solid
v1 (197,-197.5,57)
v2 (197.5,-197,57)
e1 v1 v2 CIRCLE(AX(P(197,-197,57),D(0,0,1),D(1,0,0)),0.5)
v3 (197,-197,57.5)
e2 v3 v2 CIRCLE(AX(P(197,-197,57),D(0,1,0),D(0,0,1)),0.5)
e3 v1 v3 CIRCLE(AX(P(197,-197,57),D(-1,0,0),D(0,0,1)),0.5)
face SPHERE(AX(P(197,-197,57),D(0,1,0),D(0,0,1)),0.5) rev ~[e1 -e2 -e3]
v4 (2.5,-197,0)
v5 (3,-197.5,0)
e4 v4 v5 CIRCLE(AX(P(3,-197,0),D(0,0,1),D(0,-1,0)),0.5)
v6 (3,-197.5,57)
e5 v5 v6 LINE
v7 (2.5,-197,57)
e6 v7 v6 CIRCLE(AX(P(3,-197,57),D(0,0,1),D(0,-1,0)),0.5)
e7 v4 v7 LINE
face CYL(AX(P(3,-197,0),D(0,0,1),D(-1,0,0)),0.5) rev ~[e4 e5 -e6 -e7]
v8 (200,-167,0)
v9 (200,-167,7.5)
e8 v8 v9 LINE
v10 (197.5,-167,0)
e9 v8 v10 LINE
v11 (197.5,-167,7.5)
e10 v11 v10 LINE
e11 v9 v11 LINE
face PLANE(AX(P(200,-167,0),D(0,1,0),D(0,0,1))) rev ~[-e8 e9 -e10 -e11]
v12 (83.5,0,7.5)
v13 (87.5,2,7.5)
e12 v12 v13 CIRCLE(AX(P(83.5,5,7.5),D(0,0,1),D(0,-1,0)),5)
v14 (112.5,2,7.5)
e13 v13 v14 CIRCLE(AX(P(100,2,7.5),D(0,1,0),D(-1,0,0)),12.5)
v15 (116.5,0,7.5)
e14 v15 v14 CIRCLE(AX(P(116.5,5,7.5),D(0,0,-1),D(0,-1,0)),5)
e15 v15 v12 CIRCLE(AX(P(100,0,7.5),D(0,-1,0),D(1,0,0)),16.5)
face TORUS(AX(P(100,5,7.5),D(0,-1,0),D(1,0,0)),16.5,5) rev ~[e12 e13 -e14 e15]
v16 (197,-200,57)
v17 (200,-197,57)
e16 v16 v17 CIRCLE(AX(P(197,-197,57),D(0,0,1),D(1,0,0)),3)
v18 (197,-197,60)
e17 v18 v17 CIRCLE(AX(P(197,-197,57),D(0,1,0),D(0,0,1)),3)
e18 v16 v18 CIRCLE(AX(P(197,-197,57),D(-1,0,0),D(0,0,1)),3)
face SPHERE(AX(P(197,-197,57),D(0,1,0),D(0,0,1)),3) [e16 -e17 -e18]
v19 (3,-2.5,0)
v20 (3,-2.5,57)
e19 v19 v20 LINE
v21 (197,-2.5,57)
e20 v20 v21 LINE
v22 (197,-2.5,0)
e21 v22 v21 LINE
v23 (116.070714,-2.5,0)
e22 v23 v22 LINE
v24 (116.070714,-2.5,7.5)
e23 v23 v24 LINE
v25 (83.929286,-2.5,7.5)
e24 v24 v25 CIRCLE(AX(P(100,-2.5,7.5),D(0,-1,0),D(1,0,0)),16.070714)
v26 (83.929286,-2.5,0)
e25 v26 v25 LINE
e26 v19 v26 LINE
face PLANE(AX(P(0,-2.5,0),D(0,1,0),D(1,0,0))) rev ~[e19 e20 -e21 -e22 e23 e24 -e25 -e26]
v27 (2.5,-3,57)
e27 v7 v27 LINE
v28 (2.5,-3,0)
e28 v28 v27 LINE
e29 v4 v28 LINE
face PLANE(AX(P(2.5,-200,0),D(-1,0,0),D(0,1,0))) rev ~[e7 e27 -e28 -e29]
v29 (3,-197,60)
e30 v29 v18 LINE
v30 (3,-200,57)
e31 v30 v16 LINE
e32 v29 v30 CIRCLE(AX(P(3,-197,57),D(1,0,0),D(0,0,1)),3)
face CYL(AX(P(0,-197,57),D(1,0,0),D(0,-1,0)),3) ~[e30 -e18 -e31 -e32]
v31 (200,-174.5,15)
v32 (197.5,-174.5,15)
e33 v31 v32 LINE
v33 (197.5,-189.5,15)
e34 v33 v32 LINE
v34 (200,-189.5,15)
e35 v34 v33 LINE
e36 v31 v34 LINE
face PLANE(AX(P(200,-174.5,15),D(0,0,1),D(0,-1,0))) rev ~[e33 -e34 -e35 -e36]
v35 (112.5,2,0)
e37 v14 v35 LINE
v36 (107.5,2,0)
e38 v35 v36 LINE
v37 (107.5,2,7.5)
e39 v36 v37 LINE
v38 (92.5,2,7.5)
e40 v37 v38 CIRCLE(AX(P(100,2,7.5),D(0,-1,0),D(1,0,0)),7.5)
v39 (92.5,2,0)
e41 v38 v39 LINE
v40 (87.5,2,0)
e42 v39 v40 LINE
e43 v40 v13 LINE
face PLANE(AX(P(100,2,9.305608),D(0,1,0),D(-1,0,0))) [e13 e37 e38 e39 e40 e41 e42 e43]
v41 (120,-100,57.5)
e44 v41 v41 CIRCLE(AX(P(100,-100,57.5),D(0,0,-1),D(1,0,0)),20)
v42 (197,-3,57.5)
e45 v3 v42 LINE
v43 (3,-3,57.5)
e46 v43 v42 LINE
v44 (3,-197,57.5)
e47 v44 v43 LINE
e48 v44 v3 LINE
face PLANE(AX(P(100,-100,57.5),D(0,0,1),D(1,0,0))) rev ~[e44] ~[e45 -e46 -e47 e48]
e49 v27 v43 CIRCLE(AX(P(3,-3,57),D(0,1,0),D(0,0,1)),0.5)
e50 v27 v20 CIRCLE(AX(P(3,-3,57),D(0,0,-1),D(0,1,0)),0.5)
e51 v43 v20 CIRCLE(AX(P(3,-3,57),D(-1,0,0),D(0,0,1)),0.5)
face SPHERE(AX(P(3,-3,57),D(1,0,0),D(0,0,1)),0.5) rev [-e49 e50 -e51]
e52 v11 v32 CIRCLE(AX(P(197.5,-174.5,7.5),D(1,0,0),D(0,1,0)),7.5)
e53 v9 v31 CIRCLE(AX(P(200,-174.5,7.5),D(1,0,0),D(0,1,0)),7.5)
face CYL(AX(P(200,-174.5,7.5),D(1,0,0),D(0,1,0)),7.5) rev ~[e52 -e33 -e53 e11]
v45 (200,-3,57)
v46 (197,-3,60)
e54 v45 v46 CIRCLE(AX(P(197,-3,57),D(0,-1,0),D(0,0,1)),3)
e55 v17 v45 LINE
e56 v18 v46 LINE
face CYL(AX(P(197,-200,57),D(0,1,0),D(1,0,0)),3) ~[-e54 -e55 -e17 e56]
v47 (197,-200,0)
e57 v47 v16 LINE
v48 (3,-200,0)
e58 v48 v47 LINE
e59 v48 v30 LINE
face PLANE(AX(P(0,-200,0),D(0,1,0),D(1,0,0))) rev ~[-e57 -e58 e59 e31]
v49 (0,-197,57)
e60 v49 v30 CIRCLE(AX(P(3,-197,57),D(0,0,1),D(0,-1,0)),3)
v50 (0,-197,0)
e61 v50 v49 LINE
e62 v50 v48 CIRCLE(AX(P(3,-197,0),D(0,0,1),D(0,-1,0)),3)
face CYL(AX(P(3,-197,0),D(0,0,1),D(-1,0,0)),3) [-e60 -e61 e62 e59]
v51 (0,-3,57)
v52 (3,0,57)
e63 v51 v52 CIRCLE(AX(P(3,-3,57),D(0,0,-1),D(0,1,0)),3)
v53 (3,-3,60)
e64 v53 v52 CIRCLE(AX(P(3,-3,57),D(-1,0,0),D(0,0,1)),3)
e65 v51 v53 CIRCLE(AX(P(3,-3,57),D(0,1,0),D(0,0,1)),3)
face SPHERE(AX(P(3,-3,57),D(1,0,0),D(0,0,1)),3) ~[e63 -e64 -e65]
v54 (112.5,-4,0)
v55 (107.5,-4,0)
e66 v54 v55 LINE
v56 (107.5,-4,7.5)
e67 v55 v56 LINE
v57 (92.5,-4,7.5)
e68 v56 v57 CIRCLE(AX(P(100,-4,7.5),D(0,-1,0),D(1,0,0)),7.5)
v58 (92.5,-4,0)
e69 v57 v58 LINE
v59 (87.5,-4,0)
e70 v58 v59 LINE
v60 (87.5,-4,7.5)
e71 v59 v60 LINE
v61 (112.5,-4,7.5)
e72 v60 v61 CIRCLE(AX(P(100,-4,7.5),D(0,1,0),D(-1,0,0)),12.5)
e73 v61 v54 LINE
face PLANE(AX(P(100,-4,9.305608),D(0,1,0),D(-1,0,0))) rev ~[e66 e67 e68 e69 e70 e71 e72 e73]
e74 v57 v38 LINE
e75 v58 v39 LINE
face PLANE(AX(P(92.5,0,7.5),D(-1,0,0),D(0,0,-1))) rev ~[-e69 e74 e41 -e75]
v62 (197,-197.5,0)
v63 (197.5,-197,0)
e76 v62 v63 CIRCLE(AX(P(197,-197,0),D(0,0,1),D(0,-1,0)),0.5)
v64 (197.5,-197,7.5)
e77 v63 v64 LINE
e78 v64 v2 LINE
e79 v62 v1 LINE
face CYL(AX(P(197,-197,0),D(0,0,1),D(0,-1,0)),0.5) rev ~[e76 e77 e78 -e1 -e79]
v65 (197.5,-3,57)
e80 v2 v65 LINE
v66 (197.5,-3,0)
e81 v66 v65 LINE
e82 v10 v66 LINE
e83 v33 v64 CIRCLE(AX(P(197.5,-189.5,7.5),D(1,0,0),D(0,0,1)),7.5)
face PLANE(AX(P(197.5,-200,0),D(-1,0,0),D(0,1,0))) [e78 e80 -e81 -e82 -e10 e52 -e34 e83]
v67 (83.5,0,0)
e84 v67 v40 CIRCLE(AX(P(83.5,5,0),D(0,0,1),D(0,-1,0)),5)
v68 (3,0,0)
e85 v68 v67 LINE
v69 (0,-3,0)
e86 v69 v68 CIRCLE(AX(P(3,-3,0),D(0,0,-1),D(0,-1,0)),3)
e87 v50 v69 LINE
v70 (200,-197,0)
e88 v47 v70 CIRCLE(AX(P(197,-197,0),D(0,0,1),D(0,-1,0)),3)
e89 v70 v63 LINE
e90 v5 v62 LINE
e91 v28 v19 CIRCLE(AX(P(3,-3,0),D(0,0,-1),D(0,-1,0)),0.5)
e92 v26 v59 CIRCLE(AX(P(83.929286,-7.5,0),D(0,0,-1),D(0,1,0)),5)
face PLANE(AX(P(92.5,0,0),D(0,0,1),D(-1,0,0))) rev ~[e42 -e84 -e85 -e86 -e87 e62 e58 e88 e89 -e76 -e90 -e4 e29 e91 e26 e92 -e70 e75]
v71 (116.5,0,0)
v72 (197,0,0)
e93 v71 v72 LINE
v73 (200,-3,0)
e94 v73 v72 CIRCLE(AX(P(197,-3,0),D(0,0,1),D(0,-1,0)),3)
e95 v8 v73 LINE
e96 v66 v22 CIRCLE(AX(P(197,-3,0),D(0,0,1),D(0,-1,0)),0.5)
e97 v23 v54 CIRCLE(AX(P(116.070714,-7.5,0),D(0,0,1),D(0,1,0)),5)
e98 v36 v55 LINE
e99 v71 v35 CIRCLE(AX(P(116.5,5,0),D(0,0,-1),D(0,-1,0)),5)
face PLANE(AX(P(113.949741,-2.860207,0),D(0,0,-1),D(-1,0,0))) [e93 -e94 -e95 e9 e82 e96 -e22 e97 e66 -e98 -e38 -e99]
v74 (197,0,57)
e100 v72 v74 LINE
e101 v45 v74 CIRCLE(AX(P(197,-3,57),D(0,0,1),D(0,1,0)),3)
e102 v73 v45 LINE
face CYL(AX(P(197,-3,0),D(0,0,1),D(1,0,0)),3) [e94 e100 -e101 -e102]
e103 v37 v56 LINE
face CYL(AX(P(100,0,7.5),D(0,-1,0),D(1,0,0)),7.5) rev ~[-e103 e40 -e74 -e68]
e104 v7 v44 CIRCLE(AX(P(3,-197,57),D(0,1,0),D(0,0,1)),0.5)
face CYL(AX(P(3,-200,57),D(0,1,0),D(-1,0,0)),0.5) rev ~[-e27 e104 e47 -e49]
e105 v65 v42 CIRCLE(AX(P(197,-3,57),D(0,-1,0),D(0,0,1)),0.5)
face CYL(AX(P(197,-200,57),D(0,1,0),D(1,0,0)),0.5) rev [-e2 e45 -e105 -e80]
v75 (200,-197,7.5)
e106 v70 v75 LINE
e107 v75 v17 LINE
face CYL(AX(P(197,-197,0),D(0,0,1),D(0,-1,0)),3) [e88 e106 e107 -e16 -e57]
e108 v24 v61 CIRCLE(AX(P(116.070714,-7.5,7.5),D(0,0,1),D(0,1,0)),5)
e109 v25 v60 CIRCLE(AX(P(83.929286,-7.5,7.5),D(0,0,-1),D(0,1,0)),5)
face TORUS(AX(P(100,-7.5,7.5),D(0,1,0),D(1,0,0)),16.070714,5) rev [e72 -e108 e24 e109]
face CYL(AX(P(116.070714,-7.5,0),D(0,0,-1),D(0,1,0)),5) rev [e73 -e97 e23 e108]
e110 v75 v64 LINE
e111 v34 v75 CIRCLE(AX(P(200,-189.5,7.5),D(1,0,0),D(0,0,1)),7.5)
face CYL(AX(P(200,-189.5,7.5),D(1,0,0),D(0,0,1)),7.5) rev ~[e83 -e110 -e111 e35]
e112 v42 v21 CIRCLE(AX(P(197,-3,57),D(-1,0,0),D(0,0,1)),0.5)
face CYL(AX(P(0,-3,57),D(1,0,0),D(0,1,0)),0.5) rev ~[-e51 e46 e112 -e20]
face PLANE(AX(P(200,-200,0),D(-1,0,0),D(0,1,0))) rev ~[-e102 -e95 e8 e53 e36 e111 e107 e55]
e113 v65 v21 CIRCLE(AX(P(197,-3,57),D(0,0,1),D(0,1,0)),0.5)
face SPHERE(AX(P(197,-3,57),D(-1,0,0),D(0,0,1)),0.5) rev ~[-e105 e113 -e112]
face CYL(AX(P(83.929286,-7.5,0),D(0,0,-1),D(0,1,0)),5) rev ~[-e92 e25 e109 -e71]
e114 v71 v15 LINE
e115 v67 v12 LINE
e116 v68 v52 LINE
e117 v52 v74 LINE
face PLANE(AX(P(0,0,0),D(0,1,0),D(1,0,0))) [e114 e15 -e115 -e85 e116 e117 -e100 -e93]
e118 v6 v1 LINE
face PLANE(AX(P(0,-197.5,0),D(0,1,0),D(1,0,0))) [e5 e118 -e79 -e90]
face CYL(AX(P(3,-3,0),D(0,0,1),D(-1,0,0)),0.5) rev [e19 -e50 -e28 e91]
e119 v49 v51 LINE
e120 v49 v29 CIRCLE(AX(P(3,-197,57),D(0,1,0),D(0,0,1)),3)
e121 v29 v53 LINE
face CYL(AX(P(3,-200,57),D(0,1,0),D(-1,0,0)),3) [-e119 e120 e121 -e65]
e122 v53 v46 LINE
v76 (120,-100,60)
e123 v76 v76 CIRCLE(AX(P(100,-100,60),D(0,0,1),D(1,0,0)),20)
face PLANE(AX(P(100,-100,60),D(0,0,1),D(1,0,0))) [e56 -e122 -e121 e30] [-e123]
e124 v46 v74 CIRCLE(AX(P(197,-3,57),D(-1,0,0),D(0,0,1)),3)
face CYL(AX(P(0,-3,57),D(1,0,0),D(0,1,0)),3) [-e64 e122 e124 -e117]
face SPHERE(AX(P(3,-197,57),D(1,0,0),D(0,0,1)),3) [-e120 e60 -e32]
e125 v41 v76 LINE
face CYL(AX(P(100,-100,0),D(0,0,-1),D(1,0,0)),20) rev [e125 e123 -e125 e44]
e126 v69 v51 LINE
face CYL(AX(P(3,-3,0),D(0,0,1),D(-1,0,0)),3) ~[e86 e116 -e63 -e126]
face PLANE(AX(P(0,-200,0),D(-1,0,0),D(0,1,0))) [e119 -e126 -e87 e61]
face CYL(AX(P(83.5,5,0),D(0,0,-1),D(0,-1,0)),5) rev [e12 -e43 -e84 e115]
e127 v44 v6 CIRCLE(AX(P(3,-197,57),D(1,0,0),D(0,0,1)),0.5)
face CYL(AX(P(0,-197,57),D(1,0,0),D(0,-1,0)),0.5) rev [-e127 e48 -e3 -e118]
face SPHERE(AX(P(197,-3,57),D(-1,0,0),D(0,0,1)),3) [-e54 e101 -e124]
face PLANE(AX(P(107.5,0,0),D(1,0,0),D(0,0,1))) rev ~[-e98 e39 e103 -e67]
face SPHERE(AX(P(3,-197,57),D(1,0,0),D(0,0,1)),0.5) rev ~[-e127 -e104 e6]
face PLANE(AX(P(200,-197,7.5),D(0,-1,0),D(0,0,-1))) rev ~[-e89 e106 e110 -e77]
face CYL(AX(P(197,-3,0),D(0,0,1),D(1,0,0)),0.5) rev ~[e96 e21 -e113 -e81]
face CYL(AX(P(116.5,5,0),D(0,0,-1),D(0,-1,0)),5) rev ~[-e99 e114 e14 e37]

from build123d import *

# Parameters (mm, degrees)
F0_W          = 200
F0_H          = 200
F0_R          = 20
F1_DEPTH      = 60
F2_R          = 3
F3_T          = -2.5
F4_DEPTH      = 60
F6_DEPTH      = 25
F8_DEPTH      = 25
F9_DEPTH      = 2
F9_DEPTH_BACK = 4
F10_T1_DEPTH  = 7.5
F10_T4_ANGLE  = 180
F10_T6_ANGLE  = 180


# Not quite as in the source:
# - a fillet or chamfer that OpenCascade refuses, or shapes differently, is made with other operations: its cross-section is extruded or revolved along the edge and cut away or added


with BuildPart() as f1:
    # F0 (on Top) → F1 (new body)
    with BuildSketch(Plane.XY):
        with Locations((100, -100)):
            Rectangle(F0_W, F0_H)
        with Locations((100, -100)):
            Circle(F0_R, mode=Mode.SUBTRACT)
        with Locations((100, -100)):
            Circle(F0_R)
    extrude(amount=F1_DEPTH)

    # F2
    f2_edges = [f1.edges().sort_by_distance(p)[0] for p in [
        (100, 0, 60),
        (200, -100, 60),
        (100, -200, 60),
        (0, -100, 60),
        (0, 0, 30),
        (0, -200, 30),
        (200, -200, 30),
        (200, 0, 30),
    ]]
    fillet(f2_edges, radius=F2_R)

    # F3
    f3_openings = [f1.faces().sort_by_distance(p)[0] for p in [
        (100, -100, 0),
    ]]
    offset(amount=F3_T, openings=f3_openings)

    # F0 (on Top) → F4 (cut, through all)
    with BuildSketch(Plane.XY):
        with Locations((100, -100)):
            Circle(F0_R)
    extrude(amount=F4_DEPTH, mode=Mode.SUBTRACT)

    # F5 (on face) → F6 (cut)
    with BuildSketch(Plane.YZ.offset(200)):
        with BuildLine():
            Line((-197, 7.5), (-197, 0))
            Line((-197, 0), (-167, 0))
            Line((-167, 0), (-167, 7.5))
            ThreePointArc((-167, 7.5), (-169.1966991411, 12.8033008589), (-174.5, 15))
            Line((-174.5, 15), (-189.5, 15))
            ThreePointArc((-189.5, 15), (-194.8033008589, 12.8033008589), (-197, 7.5))
        make_face()
    extrude(amount=-F6_DEPTH, mode=Mode.SUBTRACT)

    # F7 (on face) → F8 (cut)
    with BuildSketch(Plane(origin=(0, 0, 0), x_dir=(-1, 0, 0), z_dir=(0, 1, 0))):
        with BuildLine():
            Line((-92.5, 0), (-92.5, 7.5))
            ThreePointArc((-92.5, 7.5), (-100, 15), (-107.5, 7.5))
            Line((-107.5, 7.5), (-107.5, 0))
            Line((-107.5, 0), (-92.5, 0))
        make_face()
    extrude(amount=-F8_DEPTH, mode=Mode.SUBTRACT)

    # F7 (on face) → F9 (join, two sides)
    with BuildSketch(Plane(origin=(0, 0, 0), x_dir=(-1, 0, 0), z_dir=(0, 1, 0))) as f9_sk:
        with BuildLine():
            ThreePointArc((-107.5, 7.5), (-100, 15), (-92.5, 7.5))
            Line((-92.5, 7.5), (-92.5, 0))
            Line((-92.5, 0), (-87.5, 0))
            Line((-87.5, 0), (-87.5, 7.5))
            ThreePointArc((-87.5, 7.5), (-100, 20), (-112.5, 7.5))
            Line((-112.5, 7.5), (-112.5, 0))
            Line((-112.5, 0), (-107.5, 0))
            Line((-107.5, 0), (-107.5, 7.5))
        make_face()
    extrude(amount=F9_DEPTH)
    extrude(f9_sk.sketch, amount=-F9_DEPTH_BACK)

    # F10: fillet of radius 5 on 2 edges, made by hand

    # F10_s2 → F10_t1 (join)
    with BuildSketch(Plane.XY):
        with BuildLine():
            ThreePointArc((116.0707142143, -2.5), (114.1342225412, -2.8902277714), (112.5, -4))
            Line((112.5, -4), (112.5, -2.5))
            Line((112.5, -2.5), (116.0707142143, -2.5))
        make_face()
        with BuildLine():
            ThreePointArc((83.9292857857, -2.5), (85.8657774588, -2.8902277714), (87.5, -4))
            Line((87.5, -4), (87.5, -2.5))
            Line((87.5, -2.5), (83.9292857857, -2.5))
        make_face()
        with BuildLine():
            ThreePointArc((116.5, 0), (114.2639320225, 0.527864045), (112.5, 2))
            Line((112.5, 2), (112.5, 0))
            Line((112.5, 0), (116.5, 0))
        make_face()
        with BuildLine():
            ThreePointArc((83.5, 0), (85.7360679775, 0.527864045), (87.5, 2))
            Line((87.5, 2), (87.5, 0))
            Line((87.5, 0), (83.5, 0))
        make_face()
    extrude(amount=F10_T1_DEPTH)

    # F10_s3 → F10_t4 (revolve)
    with BuildSketch(Plane.XY.offset(7.5)):
        with BuildLine():
            ThreePointArc((116.5, 0), (114.2639320225, 0.527864045), (112.5, 2))
            Line((112.5, 2), (112.5, 0))
            Line((112.5, 0), (116.5, 0))
        make_face()
    revolve(axis=Axis((100, 0, 7.5), (0, -1, 0)), revolution_arc=F10_T4_ANGLE)

    # F10_s5 → F10_t6 (revolve)
    with BuildSketch(Plane.XY.offset(7.5)):
        with BuildLine():
            ThreePointArc((116.0707142143, -2.5), (114.1342225412, -2.8902277714), (112.5, -4))
            Line((112.5, -4), (112.5, -2.5))
            Line((112.5, -2.5), (116.0707142143, -2.5))
        make_face()
    revolve(axis=Axis((100, -2.5, 7.5), (0, -1, 0)), revolution_arc=F10_T6_ANGLE)


solid = f1.part
